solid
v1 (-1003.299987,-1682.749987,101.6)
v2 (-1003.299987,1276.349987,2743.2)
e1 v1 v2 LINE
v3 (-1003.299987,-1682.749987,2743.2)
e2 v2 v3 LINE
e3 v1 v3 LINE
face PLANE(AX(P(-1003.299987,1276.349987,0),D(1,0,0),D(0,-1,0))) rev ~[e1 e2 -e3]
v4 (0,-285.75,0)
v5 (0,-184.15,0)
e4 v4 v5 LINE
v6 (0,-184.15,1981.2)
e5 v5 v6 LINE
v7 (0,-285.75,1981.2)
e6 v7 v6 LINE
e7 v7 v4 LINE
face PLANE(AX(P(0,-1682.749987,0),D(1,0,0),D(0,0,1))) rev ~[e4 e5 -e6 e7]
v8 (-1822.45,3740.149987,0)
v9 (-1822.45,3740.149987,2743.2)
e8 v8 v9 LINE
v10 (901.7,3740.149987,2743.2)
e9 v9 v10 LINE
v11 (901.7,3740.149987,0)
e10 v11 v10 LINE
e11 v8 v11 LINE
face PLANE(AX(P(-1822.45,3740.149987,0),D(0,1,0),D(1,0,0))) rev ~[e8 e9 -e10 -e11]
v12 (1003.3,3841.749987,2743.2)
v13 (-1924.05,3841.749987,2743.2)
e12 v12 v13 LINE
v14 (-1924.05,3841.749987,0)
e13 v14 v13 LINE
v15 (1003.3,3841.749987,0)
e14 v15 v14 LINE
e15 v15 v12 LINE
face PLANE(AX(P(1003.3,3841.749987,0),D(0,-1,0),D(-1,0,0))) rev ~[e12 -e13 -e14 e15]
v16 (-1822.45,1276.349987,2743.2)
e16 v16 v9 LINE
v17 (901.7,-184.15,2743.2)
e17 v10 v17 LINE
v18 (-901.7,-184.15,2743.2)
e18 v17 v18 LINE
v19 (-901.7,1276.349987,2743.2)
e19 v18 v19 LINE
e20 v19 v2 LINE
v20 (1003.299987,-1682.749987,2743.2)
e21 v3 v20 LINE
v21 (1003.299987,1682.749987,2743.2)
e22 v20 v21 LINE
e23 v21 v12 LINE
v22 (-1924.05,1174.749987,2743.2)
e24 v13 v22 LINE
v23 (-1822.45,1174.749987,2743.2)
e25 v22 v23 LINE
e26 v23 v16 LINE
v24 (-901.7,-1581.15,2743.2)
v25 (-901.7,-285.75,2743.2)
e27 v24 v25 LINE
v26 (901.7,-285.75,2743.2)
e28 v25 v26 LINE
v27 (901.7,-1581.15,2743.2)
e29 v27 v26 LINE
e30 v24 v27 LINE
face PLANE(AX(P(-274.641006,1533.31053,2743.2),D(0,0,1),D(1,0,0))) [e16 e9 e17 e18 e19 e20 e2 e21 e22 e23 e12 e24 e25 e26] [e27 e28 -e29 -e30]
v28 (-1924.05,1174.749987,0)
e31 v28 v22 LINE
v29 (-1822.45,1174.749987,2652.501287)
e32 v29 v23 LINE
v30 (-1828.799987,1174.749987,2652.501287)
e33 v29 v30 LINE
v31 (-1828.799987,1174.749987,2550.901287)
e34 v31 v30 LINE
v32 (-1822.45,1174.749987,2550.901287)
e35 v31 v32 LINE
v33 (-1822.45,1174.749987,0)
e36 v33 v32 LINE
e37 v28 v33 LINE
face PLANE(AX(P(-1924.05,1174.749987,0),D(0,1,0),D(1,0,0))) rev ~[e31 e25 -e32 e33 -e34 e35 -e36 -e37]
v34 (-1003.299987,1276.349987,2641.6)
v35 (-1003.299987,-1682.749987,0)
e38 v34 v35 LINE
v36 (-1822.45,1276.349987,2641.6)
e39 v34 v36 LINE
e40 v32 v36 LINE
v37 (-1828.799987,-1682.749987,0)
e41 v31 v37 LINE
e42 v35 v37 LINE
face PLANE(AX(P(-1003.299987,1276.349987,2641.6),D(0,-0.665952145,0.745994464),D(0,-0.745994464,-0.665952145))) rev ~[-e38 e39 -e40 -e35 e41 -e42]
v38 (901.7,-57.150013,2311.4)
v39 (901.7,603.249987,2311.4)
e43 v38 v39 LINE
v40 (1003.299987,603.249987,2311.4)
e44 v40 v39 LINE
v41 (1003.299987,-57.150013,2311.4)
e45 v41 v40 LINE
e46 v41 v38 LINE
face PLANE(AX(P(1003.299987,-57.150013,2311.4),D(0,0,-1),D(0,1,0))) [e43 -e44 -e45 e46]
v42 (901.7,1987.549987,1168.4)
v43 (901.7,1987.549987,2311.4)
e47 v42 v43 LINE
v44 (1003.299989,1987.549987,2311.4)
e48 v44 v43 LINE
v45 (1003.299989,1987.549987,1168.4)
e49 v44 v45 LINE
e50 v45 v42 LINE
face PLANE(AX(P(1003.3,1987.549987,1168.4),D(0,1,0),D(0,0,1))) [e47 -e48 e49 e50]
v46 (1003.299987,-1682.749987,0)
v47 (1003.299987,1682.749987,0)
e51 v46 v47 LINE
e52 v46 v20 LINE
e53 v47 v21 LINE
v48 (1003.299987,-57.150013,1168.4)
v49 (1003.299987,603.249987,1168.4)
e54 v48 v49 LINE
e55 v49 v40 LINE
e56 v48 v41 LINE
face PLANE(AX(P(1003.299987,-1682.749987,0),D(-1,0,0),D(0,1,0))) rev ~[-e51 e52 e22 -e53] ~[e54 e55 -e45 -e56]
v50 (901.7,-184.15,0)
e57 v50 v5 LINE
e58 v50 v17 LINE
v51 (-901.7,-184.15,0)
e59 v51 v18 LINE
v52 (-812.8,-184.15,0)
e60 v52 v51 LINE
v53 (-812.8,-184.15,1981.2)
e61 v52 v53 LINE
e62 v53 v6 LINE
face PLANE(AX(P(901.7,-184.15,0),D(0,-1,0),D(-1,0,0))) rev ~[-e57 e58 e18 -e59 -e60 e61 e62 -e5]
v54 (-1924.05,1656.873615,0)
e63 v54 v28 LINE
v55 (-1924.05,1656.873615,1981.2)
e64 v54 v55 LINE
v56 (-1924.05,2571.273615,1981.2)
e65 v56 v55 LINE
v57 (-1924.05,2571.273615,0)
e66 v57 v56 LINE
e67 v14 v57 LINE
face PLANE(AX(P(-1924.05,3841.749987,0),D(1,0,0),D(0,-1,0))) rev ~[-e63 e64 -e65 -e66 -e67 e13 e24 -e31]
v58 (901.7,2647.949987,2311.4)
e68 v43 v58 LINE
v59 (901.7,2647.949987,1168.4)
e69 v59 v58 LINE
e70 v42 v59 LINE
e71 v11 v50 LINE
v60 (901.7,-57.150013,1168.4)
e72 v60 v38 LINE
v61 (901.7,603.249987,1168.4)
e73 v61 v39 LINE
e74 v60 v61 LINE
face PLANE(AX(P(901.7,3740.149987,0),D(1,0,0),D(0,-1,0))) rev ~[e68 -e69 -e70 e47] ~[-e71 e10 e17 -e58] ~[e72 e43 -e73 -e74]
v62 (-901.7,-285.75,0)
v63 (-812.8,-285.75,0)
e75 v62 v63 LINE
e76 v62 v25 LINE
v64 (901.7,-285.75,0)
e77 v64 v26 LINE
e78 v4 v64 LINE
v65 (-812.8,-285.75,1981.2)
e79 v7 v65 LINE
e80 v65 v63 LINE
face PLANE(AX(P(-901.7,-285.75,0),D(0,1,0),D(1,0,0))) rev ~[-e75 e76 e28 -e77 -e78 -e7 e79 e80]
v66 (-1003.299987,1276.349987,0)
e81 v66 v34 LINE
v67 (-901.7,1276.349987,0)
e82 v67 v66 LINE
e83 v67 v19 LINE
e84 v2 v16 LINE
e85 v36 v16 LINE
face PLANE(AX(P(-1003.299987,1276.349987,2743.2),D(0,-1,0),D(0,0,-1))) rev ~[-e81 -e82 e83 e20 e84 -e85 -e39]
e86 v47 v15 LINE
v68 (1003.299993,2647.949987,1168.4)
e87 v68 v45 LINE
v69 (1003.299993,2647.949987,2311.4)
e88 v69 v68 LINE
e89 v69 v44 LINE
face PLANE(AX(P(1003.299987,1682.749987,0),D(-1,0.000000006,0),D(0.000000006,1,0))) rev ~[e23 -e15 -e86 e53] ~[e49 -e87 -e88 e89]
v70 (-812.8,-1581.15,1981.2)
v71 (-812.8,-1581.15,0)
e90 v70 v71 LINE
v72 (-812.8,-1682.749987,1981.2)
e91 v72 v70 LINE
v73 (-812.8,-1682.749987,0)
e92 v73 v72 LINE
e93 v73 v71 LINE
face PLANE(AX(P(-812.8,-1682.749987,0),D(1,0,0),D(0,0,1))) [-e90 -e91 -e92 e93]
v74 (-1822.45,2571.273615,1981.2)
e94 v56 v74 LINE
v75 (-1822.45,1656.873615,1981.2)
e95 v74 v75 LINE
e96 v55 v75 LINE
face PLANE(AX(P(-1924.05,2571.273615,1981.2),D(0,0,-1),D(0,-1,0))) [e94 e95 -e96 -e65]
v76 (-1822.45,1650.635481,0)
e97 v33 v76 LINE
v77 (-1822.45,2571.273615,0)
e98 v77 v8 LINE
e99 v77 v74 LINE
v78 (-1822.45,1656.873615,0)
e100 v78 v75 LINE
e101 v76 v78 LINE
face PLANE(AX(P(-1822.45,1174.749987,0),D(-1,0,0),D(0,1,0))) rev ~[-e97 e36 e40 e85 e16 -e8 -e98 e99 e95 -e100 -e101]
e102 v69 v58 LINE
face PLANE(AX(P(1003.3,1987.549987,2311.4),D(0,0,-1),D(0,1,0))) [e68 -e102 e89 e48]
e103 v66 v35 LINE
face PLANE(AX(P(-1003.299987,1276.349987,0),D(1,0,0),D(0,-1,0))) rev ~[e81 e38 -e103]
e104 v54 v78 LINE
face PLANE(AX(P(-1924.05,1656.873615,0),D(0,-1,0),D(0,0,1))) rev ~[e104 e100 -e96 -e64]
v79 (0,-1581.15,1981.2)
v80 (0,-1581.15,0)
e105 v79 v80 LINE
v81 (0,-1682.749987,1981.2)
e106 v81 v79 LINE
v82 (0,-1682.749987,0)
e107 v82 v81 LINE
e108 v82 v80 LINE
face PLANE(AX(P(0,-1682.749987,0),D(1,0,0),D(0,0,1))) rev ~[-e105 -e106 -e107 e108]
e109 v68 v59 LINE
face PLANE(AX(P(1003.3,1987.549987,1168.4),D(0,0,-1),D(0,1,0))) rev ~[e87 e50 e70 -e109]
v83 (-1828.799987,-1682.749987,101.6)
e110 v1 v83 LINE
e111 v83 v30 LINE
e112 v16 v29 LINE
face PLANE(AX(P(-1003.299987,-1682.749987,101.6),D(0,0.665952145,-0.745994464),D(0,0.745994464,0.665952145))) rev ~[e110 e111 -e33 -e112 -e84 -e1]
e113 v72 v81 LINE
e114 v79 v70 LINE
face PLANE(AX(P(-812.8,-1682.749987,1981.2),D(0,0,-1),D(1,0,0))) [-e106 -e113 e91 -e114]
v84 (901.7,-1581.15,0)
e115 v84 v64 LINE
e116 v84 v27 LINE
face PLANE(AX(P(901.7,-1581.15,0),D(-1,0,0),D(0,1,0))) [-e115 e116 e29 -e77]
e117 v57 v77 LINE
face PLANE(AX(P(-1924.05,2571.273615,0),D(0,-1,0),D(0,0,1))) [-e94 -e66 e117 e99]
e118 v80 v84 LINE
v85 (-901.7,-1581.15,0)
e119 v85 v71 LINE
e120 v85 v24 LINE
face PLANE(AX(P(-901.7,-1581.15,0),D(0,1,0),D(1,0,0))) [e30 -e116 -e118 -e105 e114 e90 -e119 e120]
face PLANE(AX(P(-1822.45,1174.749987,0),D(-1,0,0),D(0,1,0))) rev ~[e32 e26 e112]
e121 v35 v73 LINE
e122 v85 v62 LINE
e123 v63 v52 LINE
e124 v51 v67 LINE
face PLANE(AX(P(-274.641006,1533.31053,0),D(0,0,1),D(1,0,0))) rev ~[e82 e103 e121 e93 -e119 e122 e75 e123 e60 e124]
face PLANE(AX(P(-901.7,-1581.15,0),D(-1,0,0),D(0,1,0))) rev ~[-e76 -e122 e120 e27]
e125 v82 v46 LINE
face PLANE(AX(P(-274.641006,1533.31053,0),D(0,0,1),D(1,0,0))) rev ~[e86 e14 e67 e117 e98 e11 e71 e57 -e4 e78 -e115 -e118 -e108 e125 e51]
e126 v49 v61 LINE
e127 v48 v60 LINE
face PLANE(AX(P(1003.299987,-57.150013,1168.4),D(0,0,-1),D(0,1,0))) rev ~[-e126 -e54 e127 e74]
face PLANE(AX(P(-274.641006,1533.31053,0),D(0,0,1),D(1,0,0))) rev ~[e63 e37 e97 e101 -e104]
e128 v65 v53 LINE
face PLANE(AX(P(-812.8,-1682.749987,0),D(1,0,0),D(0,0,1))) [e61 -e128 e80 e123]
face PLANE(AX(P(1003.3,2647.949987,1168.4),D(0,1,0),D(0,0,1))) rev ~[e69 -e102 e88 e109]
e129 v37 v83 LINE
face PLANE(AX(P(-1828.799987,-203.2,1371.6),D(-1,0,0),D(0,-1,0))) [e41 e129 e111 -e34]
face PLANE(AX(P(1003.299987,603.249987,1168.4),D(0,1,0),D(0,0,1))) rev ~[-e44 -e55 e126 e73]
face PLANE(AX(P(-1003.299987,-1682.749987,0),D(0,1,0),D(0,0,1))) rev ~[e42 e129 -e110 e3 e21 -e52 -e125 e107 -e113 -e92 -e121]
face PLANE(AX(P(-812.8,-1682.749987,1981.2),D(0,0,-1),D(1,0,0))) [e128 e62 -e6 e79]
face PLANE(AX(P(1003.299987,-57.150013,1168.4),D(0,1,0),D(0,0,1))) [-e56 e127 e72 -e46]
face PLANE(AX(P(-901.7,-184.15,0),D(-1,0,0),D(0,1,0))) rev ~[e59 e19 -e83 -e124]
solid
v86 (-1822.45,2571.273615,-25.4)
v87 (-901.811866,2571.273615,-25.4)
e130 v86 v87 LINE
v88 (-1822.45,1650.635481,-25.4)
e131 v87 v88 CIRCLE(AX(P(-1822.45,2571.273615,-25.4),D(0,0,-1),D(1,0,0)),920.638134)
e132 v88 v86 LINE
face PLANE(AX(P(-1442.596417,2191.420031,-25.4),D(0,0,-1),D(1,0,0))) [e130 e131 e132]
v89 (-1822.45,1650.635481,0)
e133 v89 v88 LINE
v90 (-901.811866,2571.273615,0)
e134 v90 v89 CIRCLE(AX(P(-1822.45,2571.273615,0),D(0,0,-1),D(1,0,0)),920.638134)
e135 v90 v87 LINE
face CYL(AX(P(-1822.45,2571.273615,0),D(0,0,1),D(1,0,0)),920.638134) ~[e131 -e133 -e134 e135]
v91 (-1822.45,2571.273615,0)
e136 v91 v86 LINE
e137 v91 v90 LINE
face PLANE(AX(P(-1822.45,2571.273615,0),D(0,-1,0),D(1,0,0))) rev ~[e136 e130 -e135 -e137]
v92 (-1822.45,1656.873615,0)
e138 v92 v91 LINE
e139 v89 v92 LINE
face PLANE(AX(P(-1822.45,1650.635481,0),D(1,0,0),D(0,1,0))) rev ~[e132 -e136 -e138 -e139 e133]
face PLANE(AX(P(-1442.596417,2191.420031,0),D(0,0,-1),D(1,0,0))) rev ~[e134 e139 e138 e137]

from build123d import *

# Parameters (mm, degrees)
F0_W      = 1803.4
F0_H      = 1295.4
F1_DEPTH  = 2743.2
F2_W      = 812.8
F2_H      = 1981.2
F3_DEPTH  = 3606.8
F4_W      = 914.4
F4_H      = 1981.2
F5_DEPTH  = 101.6
F6_W      = 660.4
F6_H      = 1143
F7_DEPTH  = 101.6
F8_W      = 660.4
F8_H      = 1143
F9_DEPTH  = 101.6
F11_DEPTH = 25.4
F13_DEPTH = 825.5


# Not quite as in the source:
# - ends of sketch curves that miss each other by under 0.0002 mm in the source are joined


with BuildPart() as f1:
    # F0 (on Top) → F1 (new body)
    with BuildSketch(Plane.XY):
        Polygon((901.7, 3740.1499866486), (901.7, 1682.7499866486), (901.7, 1581.15), (901.7, -184.15), (-901.7, -184.15), (-901.7, 1276.3499866486), (-1003.2999866486, 1276.3499866486), (-1003.2999866486, -1682.7499866486), (1003.2999866486, -1682.7499866486), (1003.2999866486, 1682.7499866486), (1003.3, 3841.7499866486), (-1924.05, 3841.7499866486), (-1924.05, 1174.7499866486), (-1822.45, 1174.7499866486), (-1822.45, 3740.1499866486), align=None)
        with Locations((0, -933.45)):
            Rectangle(F0_W, F0_H, mode=Mode.SUBTRACT)
    extrude(amount=F1_DEPTH)

    # F2 (on face) → F3 (cut)
    with BuildSketch(Plane.XZ.offset(1682.7499866486)):
        with Locations((-406.4, 990.6)):
            Rectangle(F2_W, F2_H)
    extrude(amount=-F3_DEPTH, mode=Mode.SUBTRACT)

    # F4 (on face) → F5 (cut)
    with BuildSketch(Plane(origin=(-1924.05, 0, 0), x_dir=(0, -1, 0), z_dir=(-1, 0, 0))):
        with Locations((-2114.073614502, 990.6)):
            Rectangle(F4_W, F4_H)
    extrude(amount=-F5_DEPTH, mode=Mode.SUBTRACT)

    # F6 (on face) → F7 (cut)
    with BuildSketch(Plane.YZ.offset(1003.2999866486)):
        with Locations((273.0499866486, 1739.9)):
            Rectangle(F6_W, F6_H)
    extrude(amount=-F7_DEPTH, mode=Mode.SUBTRACT)

    # F8 (on face) → F9 (cut)
    with BuildSketch(Plane.YZ.offset(1003.3)):
        with Locations((2317.7499866486, 1739.9)):
            Rectangle(F8_W, F8_H)
    extrude(amount=-F9_DEPTH, mode=Mode.SUBTRACT)

    # F10 (on face) → F11 (join)
    with BuildSketch(Plane(origin=(0, 0, 0), x_dir=(1, 0, 0), z_dir=(0, 0, -1))):
        with BuildLine():
            Line((-1822.45, -1650.6354808807), (-1822.45, -2571.273614502))
            Line((-1822.45, -2571.273614502), (-901.8118663788, -2571.273614502))
            ThreePointArc((-901.8118663788, -2571.273614502), (-1171.4605326975, -1920.2841471995), (-1822.45, -1650.6354808807))
        make_face()
    extrude(amount=F11_DEPTH)

    # F12 (on face) → F13 (join)
    with BuildSketch(Plane(origin=(-1003.2999866486, 0, 0), x_dir=(0, -1, 0), z_dir=(-1, 0, 0))):
        Polygon((1682.7499866486, 101.6), (-1276.3499866486, 2743.2), (-1276.3499866486, 2641.6), (1682.7499866486, 0), align=None)
    extrude(amount=F13_DEPTH)


solid = f1.part
